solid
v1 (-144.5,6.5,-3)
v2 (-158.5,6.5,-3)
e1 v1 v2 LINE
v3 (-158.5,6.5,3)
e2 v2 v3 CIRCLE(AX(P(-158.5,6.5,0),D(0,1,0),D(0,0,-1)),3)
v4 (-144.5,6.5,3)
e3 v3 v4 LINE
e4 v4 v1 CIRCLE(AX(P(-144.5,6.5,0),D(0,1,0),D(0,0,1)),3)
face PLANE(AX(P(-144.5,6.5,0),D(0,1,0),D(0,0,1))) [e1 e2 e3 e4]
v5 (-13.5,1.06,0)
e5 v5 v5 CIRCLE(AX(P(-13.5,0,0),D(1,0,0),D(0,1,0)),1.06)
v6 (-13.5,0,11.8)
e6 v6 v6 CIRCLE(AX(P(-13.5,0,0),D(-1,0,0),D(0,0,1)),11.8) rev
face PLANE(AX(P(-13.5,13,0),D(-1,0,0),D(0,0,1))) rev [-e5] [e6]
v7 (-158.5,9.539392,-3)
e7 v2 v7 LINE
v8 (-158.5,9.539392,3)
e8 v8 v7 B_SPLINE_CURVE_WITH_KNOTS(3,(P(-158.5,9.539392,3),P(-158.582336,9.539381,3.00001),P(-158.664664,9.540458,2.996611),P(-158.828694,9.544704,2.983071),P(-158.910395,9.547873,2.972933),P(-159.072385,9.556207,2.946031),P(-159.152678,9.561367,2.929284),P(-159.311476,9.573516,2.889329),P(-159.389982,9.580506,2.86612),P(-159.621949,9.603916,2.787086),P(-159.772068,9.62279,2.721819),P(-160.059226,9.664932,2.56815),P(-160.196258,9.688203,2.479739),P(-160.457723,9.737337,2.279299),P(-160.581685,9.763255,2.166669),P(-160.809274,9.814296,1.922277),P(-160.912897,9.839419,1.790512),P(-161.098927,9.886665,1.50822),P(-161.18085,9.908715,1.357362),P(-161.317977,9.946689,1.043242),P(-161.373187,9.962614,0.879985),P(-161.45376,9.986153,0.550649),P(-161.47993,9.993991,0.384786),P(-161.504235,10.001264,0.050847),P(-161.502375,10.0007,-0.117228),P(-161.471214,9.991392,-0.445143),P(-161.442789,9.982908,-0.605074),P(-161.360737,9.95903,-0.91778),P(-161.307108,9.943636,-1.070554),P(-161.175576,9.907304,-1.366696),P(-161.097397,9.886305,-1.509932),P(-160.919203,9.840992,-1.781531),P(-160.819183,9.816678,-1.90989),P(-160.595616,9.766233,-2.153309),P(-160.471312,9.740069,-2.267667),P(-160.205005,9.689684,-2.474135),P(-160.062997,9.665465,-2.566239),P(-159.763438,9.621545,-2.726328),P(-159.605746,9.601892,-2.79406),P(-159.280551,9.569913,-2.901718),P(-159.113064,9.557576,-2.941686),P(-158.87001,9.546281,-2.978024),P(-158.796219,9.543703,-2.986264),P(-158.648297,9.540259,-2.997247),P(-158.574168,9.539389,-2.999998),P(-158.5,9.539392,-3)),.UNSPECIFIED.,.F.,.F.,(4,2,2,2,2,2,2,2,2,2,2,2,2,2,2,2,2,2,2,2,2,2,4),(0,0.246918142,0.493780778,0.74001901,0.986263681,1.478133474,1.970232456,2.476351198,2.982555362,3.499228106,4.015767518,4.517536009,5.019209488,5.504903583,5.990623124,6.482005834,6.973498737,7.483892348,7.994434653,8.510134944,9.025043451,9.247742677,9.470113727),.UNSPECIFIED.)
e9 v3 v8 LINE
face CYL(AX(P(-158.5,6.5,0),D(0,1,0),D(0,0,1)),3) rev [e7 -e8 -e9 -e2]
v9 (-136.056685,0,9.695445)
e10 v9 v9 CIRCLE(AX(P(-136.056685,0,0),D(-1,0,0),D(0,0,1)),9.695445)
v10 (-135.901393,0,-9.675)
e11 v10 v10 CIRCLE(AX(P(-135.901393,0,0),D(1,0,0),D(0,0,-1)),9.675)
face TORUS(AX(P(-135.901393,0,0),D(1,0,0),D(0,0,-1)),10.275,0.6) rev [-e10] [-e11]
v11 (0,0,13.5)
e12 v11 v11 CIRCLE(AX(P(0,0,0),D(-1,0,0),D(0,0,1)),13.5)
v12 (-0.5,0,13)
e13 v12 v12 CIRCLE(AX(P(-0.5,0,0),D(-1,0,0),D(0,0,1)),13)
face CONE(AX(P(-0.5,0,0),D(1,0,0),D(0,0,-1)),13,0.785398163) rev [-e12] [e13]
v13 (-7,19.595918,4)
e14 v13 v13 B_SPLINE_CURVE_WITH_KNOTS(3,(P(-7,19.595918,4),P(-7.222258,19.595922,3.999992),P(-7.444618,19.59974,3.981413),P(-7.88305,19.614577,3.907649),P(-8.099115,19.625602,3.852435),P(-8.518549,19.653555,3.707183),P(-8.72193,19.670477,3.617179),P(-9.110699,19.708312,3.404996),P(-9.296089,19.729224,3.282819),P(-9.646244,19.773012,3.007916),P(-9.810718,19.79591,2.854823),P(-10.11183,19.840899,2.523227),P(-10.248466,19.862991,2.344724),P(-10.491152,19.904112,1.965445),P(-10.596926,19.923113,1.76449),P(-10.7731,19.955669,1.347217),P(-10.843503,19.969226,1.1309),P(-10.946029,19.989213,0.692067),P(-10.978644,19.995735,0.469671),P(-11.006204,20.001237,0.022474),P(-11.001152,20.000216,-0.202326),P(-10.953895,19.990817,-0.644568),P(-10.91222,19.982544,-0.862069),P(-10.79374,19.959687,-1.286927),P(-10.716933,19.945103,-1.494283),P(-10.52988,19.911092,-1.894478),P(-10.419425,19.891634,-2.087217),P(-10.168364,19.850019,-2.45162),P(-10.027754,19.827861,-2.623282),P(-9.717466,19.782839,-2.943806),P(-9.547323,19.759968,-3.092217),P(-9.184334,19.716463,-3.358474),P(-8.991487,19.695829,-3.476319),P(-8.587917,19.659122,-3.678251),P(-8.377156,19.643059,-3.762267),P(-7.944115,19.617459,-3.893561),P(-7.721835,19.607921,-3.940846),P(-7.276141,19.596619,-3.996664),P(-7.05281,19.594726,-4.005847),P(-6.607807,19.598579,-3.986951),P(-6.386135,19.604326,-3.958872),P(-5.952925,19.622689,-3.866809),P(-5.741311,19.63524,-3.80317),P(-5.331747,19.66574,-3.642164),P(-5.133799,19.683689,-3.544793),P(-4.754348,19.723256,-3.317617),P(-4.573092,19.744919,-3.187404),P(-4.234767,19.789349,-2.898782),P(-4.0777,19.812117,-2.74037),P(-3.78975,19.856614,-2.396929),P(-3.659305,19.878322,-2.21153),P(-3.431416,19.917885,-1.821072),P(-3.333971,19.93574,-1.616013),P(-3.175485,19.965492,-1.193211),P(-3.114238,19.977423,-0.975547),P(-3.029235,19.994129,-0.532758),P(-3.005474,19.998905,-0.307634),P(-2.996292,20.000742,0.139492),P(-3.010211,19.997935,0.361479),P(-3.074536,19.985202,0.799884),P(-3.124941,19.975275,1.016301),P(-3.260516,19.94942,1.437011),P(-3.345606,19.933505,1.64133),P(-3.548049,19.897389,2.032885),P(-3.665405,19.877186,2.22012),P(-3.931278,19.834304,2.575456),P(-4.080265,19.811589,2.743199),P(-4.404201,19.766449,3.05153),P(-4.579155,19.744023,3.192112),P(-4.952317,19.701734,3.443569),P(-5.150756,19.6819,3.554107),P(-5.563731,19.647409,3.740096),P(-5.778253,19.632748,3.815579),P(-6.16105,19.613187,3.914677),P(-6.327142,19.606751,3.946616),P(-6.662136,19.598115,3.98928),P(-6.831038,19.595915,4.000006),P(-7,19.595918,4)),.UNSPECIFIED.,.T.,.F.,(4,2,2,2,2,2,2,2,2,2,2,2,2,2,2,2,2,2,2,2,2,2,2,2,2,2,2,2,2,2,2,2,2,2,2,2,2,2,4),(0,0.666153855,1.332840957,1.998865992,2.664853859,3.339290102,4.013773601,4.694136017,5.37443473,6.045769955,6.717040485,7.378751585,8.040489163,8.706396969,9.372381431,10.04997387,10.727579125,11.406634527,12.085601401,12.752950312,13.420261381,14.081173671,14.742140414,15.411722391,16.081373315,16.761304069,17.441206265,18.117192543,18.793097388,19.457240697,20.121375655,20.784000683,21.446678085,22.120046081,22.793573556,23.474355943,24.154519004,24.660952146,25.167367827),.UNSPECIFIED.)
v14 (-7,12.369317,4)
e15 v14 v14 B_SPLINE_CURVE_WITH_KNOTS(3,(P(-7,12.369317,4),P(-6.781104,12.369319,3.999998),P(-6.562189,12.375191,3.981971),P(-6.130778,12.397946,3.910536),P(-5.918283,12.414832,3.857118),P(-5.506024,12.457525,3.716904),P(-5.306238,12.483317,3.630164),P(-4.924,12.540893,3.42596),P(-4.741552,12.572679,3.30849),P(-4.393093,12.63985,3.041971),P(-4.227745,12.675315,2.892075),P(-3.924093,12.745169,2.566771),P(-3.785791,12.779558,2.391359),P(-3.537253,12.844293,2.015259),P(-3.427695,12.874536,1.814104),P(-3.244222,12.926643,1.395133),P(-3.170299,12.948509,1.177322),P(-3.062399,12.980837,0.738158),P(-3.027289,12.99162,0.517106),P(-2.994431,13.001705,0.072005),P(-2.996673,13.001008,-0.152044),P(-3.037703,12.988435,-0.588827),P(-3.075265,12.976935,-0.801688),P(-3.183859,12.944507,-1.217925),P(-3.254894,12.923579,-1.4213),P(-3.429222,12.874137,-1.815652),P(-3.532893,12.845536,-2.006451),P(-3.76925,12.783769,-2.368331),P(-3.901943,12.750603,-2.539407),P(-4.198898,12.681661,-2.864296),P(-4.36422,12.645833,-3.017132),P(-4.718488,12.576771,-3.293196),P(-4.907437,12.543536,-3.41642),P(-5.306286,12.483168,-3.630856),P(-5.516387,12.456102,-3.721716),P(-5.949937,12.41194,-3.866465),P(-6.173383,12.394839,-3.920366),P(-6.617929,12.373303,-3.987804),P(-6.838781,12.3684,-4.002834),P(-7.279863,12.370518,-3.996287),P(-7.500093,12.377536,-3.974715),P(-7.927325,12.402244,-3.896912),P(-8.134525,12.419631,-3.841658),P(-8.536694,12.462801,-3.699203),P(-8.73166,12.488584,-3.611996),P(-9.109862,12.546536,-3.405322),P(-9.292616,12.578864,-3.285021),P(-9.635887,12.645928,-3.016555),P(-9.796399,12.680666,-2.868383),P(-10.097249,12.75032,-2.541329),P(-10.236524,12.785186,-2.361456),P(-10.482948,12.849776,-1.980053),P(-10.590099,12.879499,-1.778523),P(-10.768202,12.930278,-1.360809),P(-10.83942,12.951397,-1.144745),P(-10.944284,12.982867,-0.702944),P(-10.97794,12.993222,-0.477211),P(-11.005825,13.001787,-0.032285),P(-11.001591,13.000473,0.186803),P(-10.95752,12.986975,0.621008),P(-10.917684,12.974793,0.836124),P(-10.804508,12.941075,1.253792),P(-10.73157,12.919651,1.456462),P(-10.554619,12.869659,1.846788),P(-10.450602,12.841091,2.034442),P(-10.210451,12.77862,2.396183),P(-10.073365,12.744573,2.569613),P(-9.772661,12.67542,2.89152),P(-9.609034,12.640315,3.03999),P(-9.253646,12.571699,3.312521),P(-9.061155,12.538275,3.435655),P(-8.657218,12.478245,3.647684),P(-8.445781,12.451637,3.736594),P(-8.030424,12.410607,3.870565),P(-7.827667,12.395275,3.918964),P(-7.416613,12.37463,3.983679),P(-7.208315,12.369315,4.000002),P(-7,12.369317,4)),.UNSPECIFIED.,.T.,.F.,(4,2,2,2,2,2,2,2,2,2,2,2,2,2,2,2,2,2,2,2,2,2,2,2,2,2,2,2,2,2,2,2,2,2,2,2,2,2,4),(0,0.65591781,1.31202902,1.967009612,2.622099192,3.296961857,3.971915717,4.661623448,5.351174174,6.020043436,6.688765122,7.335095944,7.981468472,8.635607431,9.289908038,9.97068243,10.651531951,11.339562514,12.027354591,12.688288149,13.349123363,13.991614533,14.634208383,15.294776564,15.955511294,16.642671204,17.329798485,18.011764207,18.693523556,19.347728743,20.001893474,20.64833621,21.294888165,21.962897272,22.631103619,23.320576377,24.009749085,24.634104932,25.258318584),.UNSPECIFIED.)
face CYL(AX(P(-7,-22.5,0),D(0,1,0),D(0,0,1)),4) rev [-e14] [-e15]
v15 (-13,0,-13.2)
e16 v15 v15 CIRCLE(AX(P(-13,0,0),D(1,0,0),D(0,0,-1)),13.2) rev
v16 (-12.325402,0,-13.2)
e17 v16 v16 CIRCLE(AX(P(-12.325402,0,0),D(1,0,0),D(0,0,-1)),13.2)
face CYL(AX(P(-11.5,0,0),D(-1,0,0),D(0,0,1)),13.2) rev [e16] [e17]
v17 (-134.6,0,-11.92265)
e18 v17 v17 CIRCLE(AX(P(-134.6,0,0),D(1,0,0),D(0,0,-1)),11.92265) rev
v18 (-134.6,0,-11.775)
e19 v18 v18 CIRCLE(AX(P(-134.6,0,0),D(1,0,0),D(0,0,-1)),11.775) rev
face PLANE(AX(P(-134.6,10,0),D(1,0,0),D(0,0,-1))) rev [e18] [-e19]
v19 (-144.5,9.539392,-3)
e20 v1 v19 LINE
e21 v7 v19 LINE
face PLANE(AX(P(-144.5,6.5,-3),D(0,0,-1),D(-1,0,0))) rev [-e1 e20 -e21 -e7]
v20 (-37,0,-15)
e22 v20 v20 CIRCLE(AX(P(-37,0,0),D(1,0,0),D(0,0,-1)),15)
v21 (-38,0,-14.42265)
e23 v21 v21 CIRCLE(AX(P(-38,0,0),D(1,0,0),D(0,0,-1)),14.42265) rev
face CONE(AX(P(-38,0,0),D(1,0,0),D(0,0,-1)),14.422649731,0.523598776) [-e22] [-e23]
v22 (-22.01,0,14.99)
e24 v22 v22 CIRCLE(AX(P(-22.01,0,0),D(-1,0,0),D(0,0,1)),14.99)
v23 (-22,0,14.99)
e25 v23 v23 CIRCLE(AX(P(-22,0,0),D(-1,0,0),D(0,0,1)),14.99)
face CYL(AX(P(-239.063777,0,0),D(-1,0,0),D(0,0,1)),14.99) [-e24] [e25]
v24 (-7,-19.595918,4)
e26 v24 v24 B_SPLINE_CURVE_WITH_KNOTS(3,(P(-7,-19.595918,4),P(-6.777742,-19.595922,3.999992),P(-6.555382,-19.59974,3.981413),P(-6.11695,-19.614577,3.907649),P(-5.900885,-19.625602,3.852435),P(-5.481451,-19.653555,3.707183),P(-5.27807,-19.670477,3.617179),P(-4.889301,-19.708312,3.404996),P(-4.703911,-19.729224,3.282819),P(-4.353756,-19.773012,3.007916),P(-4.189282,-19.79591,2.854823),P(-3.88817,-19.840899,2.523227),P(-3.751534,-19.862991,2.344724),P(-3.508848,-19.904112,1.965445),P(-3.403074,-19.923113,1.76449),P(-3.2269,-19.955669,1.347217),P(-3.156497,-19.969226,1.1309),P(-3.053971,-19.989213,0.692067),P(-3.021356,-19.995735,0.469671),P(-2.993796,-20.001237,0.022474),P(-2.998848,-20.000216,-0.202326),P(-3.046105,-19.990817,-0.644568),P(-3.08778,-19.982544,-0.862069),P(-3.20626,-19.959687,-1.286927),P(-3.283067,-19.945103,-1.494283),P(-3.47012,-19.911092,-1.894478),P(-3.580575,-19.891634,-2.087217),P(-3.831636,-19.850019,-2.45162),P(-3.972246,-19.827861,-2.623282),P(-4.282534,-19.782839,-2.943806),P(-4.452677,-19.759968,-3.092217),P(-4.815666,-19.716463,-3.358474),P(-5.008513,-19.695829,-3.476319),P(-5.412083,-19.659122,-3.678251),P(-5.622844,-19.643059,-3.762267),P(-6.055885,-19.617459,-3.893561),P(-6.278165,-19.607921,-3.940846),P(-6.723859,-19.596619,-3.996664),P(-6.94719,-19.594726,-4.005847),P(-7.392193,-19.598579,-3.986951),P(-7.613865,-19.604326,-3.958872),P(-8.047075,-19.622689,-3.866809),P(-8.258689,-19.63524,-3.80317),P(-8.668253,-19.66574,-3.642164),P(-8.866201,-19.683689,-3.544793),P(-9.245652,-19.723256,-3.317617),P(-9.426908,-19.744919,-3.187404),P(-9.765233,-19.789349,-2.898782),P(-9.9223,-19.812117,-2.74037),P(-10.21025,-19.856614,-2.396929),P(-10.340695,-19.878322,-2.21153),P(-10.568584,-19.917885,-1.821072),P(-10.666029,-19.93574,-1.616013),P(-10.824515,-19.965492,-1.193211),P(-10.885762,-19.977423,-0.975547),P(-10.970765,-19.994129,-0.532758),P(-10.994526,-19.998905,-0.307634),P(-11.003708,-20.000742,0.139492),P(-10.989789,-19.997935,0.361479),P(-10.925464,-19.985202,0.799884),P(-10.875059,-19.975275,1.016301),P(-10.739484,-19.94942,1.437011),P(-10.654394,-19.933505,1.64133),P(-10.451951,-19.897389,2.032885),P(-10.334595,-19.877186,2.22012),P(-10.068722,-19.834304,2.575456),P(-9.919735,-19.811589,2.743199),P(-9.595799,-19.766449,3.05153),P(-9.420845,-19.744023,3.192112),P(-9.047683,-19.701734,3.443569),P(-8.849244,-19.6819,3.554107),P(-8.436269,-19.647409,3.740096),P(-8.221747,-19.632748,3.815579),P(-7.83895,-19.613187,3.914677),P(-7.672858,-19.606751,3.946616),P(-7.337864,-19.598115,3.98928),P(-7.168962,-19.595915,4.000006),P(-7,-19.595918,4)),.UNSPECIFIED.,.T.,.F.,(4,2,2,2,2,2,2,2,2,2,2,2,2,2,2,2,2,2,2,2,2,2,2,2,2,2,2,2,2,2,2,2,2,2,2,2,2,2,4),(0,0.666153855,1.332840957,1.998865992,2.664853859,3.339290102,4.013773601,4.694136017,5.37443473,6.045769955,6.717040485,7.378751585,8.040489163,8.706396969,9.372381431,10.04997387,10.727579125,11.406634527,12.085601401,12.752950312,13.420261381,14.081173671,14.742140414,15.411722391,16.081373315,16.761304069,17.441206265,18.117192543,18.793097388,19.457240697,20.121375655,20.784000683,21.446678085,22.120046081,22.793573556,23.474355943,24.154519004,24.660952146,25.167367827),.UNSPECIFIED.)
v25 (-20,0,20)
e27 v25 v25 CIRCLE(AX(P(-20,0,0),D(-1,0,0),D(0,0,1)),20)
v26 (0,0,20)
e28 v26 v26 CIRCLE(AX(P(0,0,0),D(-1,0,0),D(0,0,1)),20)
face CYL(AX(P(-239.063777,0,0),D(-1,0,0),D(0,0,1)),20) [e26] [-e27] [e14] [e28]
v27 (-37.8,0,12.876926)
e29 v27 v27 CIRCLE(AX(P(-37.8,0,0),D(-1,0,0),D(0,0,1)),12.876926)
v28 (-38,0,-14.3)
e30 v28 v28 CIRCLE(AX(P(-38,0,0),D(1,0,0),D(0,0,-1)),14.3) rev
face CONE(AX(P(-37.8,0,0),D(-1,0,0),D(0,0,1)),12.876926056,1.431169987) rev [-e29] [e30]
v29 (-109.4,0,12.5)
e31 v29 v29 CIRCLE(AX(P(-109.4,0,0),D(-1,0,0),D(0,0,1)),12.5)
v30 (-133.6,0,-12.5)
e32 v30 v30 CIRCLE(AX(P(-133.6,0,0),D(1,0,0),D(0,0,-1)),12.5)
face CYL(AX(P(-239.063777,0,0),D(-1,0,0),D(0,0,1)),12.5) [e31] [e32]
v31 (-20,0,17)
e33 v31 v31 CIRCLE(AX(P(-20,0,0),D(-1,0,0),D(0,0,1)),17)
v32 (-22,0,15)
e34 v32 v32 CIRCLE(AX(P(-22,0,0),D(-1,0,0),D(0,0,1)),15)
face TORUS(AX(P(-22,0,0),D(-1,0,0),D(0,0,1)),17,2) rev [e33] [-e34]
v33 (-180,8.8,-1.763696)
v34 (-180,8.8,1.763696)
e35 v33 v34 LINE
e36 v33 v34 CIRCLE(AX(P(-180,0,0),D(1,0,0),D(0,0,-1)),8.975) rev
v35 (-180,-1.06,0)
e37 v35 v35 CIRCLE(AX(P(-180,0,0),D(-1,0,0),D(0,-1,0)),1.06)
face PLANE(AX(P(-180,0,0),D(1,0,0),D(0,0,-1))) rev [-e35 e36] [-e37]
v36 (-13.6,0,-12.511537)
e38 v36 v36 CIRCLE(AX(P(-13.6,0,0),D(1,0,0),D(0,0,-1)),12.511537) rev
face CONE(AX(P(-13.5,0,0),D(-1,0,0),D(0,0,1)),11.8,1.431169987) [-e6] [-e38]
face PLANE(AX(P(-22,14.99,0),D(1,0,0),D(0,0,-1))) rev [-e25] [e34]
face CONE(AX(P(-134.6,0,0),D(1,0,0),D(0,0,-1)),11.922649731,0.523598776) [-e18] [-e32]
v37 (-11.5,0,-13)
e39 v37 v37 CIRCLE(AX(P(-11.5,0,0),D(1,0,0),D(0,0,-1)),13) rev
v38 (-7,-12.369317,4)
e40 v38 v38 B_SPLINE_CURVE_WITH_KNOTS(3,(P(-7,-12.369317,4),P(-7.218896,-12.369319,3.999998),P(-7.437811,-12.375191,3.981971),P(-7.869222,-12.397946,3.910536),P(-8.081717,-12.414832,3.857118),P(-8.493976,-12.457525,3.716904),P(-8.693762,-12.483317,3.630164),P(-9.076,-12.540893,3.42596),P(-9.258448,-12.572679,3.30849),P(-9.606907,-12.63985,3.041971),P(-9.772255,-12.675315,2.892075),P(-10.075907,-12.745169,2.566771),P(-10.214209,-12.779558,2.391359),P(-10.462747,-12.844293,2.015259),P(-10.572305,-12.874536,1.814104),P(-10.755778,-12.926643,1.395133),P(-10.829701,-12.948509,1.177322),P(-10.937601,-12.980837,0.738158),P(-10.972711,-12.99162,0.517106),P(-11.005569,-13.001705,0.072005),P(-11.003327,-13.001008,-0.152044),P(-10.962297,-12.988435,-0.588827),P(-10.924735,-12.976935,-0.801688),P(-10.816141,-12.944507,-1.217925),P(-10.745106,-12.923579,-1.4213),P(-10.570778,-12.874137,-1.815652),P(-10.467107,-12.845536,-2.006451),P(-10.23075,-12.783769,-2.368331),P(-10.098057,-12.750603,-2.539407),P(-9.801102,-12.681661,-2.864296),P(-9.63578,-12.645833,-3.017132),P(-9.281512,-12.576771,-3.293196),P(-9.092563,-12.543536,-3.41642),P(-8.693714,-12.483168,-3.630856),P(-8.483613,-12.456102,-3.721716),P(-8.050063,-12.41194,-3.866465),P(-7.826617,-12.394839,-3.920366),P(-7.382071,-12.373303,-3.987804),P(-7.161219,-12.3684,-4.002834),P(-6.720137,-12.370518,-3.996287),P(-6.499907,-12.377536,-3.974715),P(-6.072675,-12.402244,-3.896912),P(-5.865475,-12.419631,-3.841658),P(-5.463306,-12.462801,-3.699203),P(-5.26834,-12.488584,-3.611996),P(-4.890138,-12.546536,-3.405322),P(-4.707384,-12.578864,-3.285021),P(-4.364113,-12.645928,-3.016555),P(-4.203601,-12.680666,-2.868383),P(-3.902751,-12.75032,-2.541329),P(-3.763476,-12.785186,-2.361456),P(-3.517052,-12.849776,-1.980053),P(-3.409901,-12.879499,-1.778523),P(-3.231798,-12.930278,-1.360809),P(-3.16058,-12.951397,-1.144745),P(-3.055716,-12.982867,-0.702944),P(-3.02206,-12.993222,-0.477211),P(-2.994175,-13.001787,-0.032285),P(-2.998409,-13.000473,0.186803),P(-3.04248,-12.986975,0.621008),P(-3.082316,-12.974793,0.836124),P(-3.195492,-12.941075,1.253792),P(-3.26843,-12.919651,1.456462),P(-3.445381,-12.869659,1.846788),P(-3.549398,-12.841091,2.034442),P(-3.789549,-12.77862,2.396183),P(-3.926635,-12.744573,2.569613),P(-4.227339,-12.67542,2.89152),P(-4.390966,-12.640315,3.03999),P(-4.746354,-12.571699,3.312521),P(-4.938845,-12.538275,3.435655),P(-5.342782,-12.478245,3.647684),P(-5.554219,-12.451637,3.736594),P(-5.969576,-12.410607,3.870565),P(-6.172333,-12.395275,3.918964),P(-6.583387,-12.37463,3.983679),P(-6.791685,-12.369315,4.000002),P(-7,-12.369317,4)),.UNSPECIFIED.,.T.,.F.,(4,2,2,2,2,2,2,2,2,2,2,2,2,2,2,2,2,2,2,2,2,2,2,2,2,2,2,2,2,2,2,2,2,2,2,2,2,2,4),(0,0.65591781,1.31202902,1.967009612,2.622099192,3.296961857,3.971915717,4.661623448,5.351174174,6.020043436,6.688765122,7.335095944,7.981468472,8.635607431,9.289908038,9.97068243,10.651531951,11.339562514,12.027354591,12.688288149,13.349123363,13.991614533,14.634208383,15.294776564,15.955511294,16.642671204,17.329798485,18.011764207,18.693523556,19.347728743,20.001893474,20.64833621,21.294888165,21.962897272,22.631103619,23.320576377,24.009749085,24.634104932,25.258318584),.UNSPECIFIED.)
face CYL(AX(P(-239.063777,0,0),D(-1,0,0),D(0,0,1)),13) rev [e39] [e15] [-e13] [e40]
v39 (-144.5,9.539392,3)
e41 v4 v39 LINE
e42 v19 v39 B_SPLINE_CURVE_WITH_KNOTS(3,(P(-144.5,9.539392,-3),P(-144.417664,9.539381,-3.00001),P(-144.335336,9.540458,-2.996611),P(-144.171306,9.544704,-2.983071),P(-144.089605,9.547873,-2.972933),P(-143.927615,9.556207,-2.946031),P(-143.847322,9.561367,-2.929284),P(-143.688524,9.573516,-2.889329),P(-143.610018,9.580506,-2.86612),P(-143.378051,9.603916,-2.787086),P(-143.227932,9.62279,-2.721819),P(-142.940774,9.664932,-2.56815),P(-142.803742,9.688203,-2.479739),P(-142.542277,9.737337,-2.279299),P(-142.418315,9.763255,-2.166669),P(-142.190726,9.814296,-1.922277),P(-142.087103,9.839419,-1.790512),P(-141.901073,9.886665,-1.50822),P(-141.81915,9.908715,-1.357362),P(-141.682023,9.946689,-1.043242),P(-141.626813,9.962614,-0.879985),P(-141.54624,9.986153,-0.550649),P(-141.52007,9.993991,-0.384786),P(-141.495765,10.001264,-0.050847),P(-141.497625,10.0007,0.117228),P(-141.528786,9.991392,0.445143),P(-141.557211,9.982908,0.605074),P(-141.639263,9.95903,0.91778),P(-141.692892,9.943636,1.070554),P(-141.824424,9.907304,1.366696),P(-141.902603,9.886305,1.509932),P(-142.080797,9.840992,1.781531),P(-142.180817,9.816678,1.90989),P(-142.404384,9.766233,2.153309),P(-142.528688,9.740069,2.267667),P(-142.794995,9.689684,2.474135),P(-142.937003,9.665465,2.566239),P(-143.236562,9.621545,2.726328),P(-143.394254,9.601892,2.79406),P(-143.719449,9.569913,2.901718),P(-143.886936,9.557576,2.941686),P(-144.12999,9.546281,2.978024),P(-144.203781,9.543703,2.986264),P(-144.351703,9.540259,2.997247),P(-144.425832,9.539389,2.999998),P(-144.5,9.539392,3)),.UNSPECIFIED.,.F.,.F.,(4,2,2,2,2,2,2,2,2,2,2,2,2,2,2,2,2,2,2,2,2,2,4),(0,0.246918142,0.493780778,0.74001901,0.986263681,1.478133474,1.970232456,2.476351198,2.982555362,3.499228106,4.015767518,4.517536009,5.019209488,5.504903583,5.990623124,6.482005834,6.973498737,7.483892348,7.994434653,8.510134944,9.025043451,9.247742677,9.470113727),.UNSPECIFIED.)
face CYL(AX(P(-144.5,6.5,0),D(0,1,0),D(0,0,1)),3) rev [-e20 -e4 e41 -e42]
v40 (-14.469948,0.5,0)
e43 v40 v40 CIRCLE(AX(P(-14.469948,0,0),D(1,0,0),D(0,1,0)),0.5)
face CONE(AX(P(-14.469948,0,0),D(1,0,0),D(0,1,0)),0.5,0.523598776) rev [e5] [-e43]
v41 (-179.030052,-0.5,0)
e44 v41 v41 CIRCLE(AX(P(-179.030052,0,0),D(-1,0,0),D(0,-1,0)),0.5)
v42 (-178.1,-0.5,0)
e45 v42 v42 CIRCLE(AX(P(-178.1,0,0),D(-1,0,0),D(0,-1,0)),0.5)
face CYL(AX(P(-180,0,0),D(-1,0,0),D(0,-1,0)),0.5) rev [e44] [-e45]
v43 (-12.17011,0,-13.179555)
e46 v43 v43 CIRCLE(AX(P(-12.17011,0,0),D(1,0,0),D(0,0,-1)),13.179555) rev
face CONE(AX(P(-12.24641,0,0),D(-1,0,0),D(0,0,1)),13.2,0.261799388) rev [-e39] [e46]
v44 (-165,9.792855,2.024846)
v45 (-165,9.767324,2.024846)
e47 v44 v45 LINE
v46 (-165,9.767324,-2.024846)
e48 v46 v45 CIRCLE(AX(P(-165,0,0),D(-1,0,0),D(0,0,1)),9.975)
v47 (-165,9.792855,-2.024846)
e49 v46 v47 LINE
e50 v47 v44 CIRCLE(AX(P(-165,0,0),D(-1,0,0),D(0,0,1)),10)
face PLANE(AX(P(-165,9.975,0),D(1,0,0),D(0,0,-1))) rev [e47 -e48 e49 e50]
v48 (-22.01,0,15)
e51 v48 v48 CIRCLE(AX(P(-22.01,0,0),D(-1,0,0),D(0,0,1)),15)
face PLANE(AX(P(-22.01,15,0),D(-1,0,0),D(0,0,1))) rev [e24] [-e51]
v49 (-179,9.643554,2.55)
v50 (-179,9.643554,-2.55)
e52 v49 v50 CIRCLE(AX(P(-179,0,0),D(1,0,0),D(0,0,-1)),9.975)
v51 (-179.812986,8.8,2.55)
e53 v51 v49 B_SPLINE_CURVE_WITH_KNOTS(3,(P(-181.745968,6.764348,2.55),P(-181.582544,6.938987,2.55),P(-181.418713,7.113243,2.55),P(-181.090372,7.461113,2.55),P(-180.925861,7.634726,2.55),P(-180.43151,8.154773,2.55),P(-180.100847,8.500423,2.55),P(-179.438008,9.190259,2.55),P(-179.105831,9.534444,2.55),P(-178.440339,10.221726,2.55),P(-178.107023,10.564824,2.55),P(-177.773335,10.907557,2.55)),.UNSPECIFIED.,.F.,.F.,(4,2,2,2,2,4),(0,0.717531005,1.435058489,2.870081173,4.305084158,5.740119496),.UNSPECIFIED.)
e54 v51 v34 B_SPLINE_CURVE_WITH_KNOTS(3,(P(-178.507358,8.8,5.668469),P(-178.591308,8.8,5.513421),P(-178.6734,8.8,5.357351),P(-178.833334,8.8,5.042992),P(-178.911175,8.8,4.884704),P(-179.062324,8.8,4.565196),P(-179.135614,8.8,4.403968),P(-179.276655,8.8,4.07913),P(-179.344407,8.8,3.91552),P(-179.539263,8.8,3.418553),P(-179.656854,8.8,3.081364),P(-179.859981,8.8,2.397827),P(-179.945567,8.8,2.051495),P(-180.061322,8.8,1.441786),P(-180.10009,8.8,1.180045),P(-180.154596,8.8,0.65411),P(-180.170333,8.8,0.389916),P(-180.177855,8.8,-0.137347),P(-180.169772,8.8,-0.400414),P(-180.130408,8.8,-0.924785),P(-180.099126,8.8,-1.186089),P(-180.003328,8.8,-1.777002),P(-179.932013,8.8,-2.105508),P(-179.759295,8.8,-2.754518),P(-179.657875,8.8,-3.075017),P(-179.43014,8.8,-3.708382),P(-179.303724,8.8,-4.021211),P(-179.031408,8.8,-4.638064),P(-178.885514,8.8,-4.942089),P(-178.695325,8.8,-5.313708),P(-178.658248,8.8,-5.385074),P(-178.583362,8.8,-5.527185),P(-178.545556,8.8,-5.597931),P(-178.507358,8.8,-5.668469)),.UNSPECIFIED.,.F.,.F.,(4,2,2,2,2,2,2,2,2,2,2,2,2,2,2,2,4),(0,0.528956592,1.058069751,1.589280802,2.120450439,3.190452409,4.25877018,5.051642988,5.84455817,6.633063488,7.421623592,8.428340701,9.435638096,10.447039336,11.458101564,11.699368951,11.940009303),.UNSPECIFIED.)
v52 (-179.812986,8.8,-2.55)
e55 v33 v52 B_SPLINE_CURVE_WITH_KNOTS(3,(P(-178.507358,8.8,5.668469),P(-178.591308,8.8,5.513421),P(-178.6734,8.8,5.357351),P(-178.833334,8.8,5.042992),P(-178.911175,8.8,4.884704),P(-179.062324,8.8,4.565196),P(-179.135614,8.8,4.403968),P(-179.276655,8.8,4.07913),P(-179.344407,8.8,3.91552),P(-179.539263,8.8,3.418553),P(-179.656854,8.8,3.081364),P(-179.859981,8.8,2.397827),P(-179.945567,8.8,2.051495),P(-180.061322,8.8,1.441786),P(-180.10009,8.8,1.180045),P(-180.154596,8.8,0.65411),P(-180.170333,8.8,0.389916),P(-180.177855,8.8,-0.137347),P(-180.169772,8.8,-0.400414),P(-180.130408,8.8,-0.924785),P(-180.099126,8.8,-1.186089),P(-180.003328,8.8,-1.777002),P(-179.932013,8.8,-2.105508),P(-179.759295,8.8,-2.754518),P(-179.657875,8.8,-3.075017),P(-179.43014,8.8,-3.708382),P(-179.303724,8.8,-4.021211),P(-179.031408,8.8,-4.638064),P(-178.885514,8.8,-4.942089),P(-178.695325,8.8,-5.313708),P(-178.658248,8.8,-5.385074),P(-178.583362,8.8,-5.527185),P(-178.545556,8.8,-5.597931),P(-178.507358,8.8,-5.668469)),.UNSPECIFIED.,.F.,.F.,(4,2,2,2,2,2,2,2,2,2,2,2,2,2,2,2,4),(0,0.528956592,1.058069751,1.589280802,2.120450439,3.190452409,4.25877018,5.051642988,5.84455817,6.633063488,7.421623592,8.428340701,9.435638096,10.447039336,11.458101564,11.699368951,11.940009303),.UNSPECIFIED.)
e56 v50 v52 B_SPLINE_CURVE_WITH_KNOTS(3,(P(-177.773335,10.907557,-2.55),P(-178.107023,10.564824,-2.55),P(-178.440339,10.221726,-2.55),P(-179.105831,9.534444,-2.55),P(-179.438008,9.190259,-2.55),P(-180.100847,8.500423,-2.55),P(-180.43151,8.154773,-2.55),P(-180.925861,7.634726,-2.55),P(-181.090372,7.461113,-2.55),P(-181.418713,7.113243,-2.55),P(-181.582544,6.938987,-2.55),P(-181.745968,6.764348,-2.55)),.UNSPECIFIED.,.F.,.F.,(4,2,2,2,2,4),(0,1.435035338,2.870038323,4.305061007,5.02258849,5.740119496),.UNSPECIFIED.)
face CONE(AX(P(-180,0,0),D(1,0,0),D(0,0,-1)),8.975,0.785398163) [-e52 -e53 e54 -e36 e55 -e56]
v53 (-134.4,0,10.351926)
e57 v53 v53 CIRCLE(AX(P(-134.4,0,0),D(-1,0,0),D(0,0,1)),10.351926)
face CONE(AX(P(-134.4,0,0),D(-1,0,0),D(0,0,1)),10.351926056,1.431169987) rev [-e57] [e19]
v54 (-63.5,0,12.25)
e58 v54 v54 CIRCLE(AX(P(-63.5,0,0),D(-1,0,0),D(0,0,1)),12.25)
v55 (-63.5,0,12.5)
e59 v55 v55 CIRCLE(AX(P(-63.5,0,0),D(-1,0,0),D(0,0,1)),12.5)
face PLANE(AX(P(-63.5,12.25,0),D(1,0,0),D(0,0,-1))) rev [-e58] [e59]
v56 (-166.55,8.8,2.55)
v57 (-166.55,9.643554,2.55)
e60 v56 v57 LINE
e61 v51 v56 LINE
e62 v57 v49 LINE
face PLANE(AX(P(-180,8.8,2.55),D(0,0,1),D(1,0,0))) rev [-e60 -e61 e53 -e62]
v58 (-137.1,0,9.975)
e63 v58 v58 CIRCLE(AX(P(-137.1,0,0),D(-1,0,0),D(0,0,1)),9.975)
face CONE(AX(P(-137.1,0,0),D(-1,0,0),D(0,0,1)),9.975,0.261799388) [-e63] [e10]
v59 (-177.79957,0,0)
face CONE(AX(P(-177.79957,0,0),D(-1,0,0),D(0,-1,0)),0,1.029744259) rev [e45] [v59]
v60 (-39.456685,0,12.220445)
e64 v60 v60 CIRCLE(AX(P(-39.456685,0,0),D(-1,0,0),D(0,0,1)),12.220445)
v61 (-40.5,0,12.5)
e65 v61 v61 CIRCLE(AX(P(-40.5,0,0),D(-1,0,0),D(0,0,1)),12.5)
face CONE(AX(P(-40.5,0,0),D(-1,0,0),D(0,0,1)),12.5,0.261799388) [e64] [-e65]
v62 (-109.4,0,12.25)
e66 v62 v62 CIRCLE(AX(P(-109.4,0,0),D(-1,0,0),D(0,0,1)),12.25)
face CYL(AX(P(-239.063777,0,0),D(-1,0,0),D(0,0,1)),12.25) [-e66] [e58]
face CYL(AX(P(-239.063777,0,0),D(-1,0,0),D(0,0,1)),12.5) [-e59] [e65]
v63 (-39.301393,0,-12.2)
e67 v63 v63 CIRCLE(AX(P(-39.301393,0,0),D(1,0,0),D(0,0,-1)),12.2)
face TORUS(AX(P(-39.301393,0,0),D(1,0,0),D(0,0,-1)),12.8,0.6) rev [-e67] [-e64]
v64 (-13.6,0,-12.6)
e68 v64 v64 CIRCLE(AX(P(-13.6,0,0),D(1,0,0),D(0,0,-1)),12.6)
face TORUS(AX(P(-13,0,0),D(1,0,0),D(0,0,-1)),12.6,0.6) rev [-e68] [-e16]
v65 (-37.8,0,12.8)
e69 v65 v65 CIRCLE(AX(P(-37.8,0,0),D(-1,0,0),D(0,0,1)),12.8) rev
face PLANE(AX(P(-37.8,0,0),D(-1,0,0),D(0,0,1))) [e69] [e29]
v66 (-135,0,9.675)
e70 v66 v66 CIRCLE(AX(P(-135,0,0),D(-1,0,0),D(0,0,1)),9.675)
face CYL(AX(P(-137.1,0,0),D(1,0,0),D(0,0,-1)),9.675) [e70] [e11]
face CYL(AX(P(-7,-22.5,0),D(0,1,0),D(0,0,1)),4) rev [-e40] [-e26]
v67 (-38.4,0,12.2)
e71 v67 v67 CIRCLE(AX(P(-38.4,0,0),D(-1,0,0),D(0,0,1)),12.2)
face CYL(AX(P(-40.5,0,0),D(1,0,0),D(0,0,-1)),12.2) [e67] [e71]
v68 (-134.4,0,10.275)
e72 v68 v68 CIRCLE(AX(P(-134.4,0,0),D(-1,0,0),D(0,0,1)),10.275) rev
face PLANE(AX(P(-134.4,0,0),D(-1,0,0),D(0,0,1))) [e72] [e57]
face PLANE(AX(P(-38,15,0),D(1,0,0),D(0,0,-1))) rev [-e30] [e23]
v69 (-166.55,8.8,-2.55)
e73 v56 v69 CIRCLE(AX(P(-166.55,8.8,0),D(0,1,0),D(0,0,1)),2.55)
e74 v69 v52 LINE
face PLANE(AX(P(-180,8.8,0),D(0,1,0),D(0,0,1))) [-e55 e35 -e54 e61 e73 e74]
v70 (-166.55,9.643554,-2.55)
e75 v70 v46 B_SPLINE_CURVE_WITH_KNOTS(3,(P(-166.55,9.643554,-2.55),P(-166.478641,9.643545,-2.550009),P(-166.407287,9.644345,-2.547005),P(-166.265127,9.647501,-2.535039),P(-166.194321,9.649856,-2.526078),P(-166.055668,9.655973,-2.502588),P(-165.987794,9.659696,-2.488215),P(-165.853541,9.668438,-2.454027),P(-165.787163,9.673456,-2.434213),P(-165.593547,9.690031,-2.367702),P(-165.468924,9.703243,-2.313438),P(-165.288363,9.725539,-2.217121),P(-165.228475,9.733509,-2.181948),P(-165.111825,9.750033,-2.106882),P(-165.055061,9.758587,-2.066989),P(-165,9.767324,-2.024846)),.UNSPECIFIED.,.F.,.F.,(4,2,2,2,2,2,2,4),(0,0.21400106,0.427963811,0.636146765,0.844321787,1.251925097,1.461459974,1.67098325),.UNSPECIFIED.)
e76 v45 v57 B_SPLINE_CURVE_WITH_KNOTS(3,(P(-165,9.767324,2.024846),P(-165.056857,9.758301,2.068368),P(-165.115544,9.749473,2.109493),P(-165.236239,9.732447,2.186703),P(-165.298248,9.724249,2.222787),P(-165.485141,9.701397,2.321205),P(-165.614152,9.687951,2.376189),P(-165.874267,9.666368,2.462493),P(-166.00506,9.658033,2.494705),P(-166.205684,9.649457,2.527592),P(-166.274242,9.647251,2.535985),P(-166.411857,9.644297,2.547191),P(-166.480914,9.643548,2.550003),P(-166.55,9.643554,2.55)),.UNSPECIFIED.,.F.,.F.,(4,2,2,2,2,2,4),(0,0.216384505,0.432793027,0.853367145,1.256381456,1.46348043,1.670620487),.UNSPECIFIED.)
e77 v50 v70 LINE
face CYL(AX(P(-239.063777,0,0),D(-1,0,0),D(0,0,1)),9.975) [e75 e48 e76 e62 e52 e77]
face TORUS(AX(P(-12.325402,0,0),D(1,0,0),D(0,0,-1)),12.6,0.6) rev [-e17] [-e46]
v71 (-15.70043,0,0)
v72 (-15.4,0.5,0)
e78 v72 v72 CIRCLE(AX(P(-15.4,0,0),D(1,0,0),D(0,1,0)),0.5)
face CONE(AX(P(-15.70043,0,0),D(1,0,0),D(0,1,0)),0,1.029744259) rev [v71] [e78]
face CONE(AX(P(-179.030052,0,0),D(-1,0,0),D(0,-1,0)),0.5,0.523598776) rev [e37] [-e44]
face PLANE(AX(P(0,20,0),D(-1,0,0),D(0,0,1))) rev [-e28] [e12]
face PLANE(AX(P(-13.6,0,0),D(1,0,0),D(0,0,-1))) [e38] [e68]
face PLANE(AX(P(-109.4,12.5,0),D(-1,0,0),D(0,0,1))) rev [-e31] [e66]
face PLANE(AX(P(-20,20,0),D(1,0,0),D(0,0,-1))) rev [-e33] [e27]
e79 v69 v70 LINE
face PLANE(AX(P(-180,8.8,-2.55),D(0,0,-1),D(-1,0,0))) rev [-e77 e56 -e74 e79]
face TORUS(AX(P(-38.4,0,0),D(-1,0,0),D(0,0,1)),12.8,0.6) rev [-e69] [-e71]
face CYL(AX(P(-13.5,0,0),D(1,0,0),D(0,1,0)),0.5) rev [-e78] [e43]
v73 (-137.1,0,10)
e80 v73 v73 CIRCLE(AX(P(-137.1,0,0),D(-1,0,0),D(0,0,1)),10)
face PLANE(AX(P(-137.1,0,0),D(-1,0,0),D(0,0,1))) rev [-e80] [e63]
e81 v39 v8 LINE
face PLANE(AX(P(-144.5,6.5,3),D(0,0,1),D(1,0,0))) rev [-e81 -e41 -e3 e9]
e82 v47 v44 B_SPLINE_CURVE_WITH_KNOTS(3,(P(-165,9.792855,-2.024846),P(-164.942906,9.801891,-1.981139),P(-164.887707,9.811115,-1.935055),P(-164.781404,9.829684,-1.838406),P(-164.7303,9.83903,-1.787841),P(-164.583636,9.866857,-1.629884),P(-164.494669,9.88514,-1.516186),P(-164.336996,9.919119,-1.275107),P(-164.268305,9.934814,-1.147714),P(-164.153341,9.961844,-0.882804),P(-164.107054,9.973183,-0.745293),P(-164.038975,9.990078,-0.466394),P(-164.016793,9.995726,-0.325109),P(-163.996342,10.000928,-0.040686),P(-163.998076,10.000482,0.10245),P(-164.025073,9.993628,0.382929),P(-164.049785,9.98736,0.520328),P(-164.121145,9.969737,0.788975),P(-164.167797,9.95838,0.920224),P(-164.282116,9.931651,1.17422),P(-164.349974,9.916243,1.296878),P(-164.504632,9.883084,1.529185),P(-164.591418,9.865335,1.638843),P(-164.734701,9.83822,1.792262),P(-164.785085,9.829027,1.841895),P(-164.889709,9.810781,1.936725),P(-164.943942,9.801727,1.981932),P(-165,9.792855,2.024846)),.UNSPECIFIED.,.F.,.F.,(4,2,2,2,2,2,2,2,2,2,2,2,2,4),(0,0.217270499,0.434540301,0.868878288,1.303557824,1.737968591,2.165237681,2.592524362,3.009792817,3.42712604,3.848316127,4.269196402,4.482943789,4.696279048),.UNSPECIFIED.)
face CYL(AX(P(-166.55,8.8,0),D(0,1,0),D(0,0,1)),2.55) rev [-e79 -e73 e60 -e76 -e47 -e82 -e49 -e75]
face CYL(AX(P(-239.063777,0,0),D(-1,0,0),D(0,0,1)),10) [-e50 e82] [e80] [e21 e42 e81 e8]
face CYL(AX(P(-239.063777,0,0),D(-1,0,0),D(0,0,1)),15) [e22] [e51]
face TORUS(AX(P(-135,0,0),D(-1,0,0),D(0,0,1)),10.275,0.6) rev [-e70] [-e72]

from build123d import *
from OCP.BRepFilletAPI import BRepFilletAPI_MakeChamfer

# Parameters (mm, degrees)
FASE1_SIZE                      = 1
SKIZZE3_R                       = 4
SCHNITT_LINEAR_AUSTRAGEN2_DEPTH = 22.5
SCHNITT_LINEAR_AUSTRAGEN3_DEPTH = 3.5
SCHNITT_LINEAR_AUSTRAGEN4_DEPTH = 1.2
FASE2_SIZE                      = 1
FASE2_SIZE2                     = 0.577350269
SCHNITT_F_T2_DEPTH              = 2
SCHNITT_F_T2_DEPTH_BACK         = 0.1
G_T1_R                          = 13.2
G_T1_R_2                        = 11.8
FASE_15_T1_SIZE2                = 0.746410162
FASE_15_T1_SIZE                 = 0.2
FASE_8_T2_SIZE                  = 0.711536972
FASE_8_T2_SIZE_2                = 0.1
RADIUS_R_R                      = 0.6
SCHNITT_F_T21_DEPTH             = 2.5
SCHNITT_F_T21_DEPTH_BACK        = 0.2
G_T11_R                         = 11.775
G_T11_R_2                       = 9.675
FASE_8_T21_SIZE2                = 1.423073944
FASE_8_T21_SIZE                 = 0.2
RADIUS_R1_R                     = 0.6
SCHNITT_F_T22_DEPTH             = 2.5
SCHNITT_F_T22_DEPTH_BACK        = 0.2
G_T12_R                         = 14.3
G_T12_R_2                       = 12.2
FASE_8_T22_SIZE                 = 1.423073944
FASE_8_T22_SIZE_2               = 0.2
RADIUS_R2_R                     = 0.6


with BuildPart() as part:
    # Skizze1 → Rotation1 (revolve)
    with BuildSketch(Plane.XY, mode=Mode.PRIVATE) as rotation1_sk:
        with BuildLine():
            Line((-180, 0), (-180, 9.975))
            Line((-180, 9.975), (-165, 9.975))
            Line((-165, 9.975), (-165, 10))
            Line((-165, 10), (-134.6, 10))
            Line((-134.6, 10), (-134.6, 12.5))
            Line((-134.6, 12.5), (-109.4, 12.5))
            Line((-109.4, 12.5), (-109.4, 12.25))
            Line((-109.4, 12.25), (-63.5, 12.25))
            Line((-63.5, 12.25), (-63.5, 12.5))
            Line((-63.5, 12.5), (-38, 12.5))
            Line((-38, 12.5), (-38, 15))
            Line((-38, 15), (-22.01, 15))
            Line((-22.01, 15), (-22.01, 14.99))
            Line((-22.01, 14.99), (-22, 14.99))
            Line((-22, 14.99), (-22, 15))
            ThreePointArc((-22, 15), (-20.585786438, 15.585786438), (-20, 17))
            Line((-20, 17), (-20, 20))
            Line((-20, 20), (0, 20))
            Line((0, 20), (0, 13.5))
            Line((0, 13.5), (-0.5, 13))
            Line((-0.5, 13), (-13.5, 13))
            Line((-13.5, 13), (-13.5, 0))
            Line((-13.5, 0), (-180, 0))
        make_face()
    revolve(rotation1_sk.sketch.rotate(Axis((-239.063776618, 0, 0), (1, 0, 0)), 90), axis=Axis((-239.063776618, 0, 0), (1, 0, 0)))

    # Fase1
    fase1_edges = [part.edges().sort_by_distance(p)[0] for p in [
        (-180, 0, -9.975),
    ]]
    chamfer(fase1_edges, length=FASE1_SIZE)

    # Skizze3 → Schnitt-Linear austragen2 (cut, symmetric)
    with BuildSketch(Plane(origin=(0, 0, 0), x_dir=(1, 0, 0), z_dir=(0, 1, 0))):
        with Locations(Location((-7, 0, 0), (0, 0, 270))):
            Circle(SKIZZE3_R)
    extrude(amount=SCHNITT_LINEAR_AUSTRAGEN2_DEPTH, both=True, mode=Mode.SUBTRACT)

    # Skizze6 → Schnitt-Linear austragen3 (cut)
    with BuildSketch(Plane(origin=(0, 10, 0), x_dir=(-1, 0, 0), z_dir=(0, 1, 0))):
        with BuildLine():
            Line((144.5, 3), (158.5, 3))
            ThreePointArc((158.5, 3), (161.5, 0), (158.5, -3))
            Line((158.5, -3), (144.5, -3))
            ThreePointArc((144.5, -3), (141.5, 0), (144.5, 3))
        make_face()
    extrude(amount=-SCHNITT_LINEAR_AUSTRAGEN3_DEPTH, mode=Mode.SUBTRACT)

    # Skizze7 → Schnitt-Linear austragen4 (cut)
    with BuildSketch(Plane(origin=(0, 10, 0), x_dir=(-1, 0, 0), z_dir=(0, 1, 0))):
        with BuildLine():
            Line((180, -2.55), (166.55, -2.55))
            ThreePointArc((166.55, -2.55), (164, 0), (166.55, 2.55))
            Line((166.55, 2.55), (180, 2.55))
            ThreePointArc((180, 2.55), (182.55, 0), (180, -2.55))
        make_face()
    extrude(amount=-SCHNITT_LINEAR_AUSTRAGEN4_DEPTH, mode=Mode.SUBTRACT)

    # Fase2: one chamfer whose edges measure the first distance from different faces: ONE call of the kernel's chamfer builder (chamfer() names one face for all edges)
    fase2_edges_1 = [part.edges().sort_by_distance(p)[0] for p in [
        (-134.6, 0, -12.5),
    ]]
    fase2_side_1 = [part.faces().sort_by_distance(p)[0] for p in [
        (-122, 0, -12.5),
    ]]
    fase2_edges_2 = [part.edges().sort_by_distance(p)[0] for p in [
        (-38, 0, -15),
    ]]
    fase2_side_2 = [part.faces().sort_by_distance(p)[0] for p in [
        (-30.005, 0, -15),
    ]]
    fase2 = BRepFilletAPI_MakeChamfer(part.part.solid().wrapped)
    for e in fase2_edges_1:
        fase2.Add(FASE2_SIZE, FASE2_SIZE2, e.wrapped, fase2_side_1[0].wrapped)  # the first distance lies on this face
    for e in fase2_edges_2:
        fase2.Add(FASE2_SIZE, FASE2_SIZE2, e.wrapped, fase2_side_2[0].wrapped)  # the first distance lies on this face
    add(Compound.cast(fase2.Shape()), mode=Mode.REPLACE)

    # Skizze31 → Schnitt-Rotation1 (revolve, cut)
    with BuildSketch(Plane(origin=(-180, 0, 0), x_dir=(0, 0, 1), z_dir=(0, -1, 0)), mode=Mode.PRIVATE) as schnitt_rotation1_sk:
        Polygon((0, -2.20043031), (0.5, -1.9), (0.5, -0.969948452), (1.06, 0), (0, 0), align=None)
    revolve(schnitt_rotation1_sk.sketch.rotate(Axis((-180, 0, 0), (1, 0, 0)), 90), axis=Axis((-180, 0, 0), (1, 0, 0)), mode=Mode.SUBTRACT)

    # Skizze32 → Schnitt-Rotation11 (revolve, cut)
    with BuildSketch(Plane(origin=(-13.5, 0, 0), x_dir=(0, 0, -1), z_dir=(0, -1, 0)), mode=Mode.PRIVATE) as schnitt_rotation11_sk:
        Polygon((0, -2.20043031), (0.5, -1.9), (0.5, -0.969948452), (1.06, 0), (0, 0), align=None)
    revolve(schnitt_rotation11_sk.sketch.rotate(Axis((-13.5, 0, 0), (-1, 0, 0)), 270), axis=Axis((-13.5, 0, 0), (-1, 0, 0)), mode=Mode.SUBTRACT)

    # g+t1 → Schnitt f+t2 (cut, two sides: drawn at the far end of the back side and taken through both)
    with BuildSketch(Plane(origin=(-13.5, -18.258316634, 5.175605519), x_dir=(0, 0, -1), z_dir=(1, 0, 0)).offset(-SCHNITT_F_T2_DEPTH_BACK)):
        with Locations((5.175605519, 18.258316634)):
            Circle(G_T1_R)
        with Locations(Location((5.175605519, 18.258316634, 0), (0, 0, 180))):
            Circle(G_T1_R_2, mode=Mode.SUBTRACT)
    extrude(amount=SCHNITT_F_T2_DEPTH + SCHNITT_F_T2_DEPTH_BACK, mode=Mode.SUBTRACT)

    # Fase 15° t1
    fase_15_t1_edges = [part.edges().sort_by_distance(p)[0] for p in [
        (-11.5, 0, 13.2),
    ]]
    fase_15_t1_side = [part.faces().sort_by_distance(p)[0] for p in [
        (-11.5, 0, 13.196),
    ]]
    chamfer(fase_15_t1_edges, length=FASE_15_T1_SIZE - 0.0001, length2=FASE_15_T1_SIZE2 - 0.0001, reference=fase_15_t1_side[0])  # a hair under: the kernel refuses the full size

    # Fase 8° t2
    # the kernel refuses this chamfer: 0.711536972, 0.1 mm, written as the material it adds along each edge
    with BuildSketch(Plane(origin=(-13.6, 0, 0), x_dir=(0, 0, 1), z_dir=(0, 1, 0))) as fase_8_t2_piece_1:
        Polygon((11.8 + FASE_8_T2_SIZE, 0), (11.8, FASE_8_T2_SIZE_2), (11.8, 0), align=None)
    revolve(axis=Axis((-13.6, 0, 0), (1, 0, 0)))

    # Radius r
    radius_r_edges = [part.edges().sort_by_distance(p)[0] for p in [
        (-13.6, 0, 13.2),
        (-12.246310162, 0, 13.2),
    ]]
    fillet(radius_r_edges, radius=RADIUS_R_R)

    # g+t11 → Schnitt f+t21 (cut, two sides: drawn at the far end of the back side and taken through both)
    with BuildSketch(Plane(origin=(-134.6, 9.708864876, 5.574410301), x_dir=(0, 0, 1), z_dir=(-1, 0, 0)).offset(-SCHNITT_F_T21_DEPTH_BACK)):
        with Locations(Location((-5.574410301, -9.708864876, 0), (0, 0, 180))):
            Circle(G_T11_R)
        with Locations((-5.574410301, -9.708864876)):
            Circle(G_T11_R_2, mode=Mode.SUBTRACT)
    extrude(amount=SCHNITT_F_T21_DEPTH + SCHNITT_F_T21_DEPTH_BACK, mode=Mode.SUBTRACT)

    # Fase 15° t11: read off the stored shape, not the designer's step
    # Fase 15° t11 outline → Fase 15° t11 (revolve)
    with BuildSketch(Plane.YX):
        Polygon((9.975, -137.1), (9.675, -135.980384758), (9.675, -137.1), align=None)
    revolve(axis=Axis((0, 0, 0), (1, 0, 0)))

    # Fase 8° t21
    fase_8_t21_edges = [part.edges().sort_by_distance(p)[0] for p in [
        (-134.4, 0, 11.775),
    ]]
    fase_8_t21_side = [part.faces().sort_by_distance(p)[0] for p in [
        (-134.404, 0, 11.775),
    ]]
    chamfer(fase_8_t21_edges, length=FASE_8_T21_SIZE - 0.0001, length2=FASE_8_T21_SIZE2 - 0.0001, reference=fase_8_t21_side[0])  # a hair under: the kernel refuses the full size

    # Radius r1
    radius_r1_edges = [part.edges().sort_by_distance(p)[0] for p in [
        (-134.4, 0, -9.675),
        (-135.980384758, 6.841258108, 6.841258108),
    ]]
    fillet(radius_r1_edges, radius=RADIUS_R1_R)

    # g+t12 → Schnitt f+t22 (cut, two sides: drawn at the far end of the back side and taken through both)
    with BuildSketch(Plane(origin=(-38, 10.867060242, 7.130430604), x_dir=(0, 0, 1), z_dir=(-1, 0, 0)).offset(-SCHNITT_F_T22_DEPTH_BACK)):
        with Locations(Location((-7.130430604, -10.867060242, 0), (0, 0, 180))):
            Circle(G_T12_R)
        with Locations((-7.130430604, -10.867060242)):
            Circle(G_T12_R_2, mode=Mode.SUBTRACT)
    extrude(amount=SCHNITT_F_T22_DEPTH + SCHNITT_F_T22_DEPTH_BACK, mode=Mode.SUBTRACT)

    # Fase 15° t12: read off the stored shape, not the designer's step
    # Fase 15° t12 outline → Fase 15° t12 (revolve)
    with BuildSketch(Plane.YX):
        Polygon((12.5, -40.5), (12.2, -39.380384758), (12.2, -40.5), align=None)
    revolve(axis=Axis((0, 0, 0), (1, 0, 0)))

    # Fase 8° t22
    # the kernel refuses this chamfer: 1.423073944, 0.2 mm, written as the material it adds along each edge
    with BuildSketch(Plane(origin=(-37.8, 0, 0), x_dir=(0, 0, -1), z_dir=(0, 1, 0))) as fase_8_t22_piece_1:
        Polygon((14.3 - FASE_8_T22_SIZE, 0), (14.3, FASE_8_T22_SIZE_2), (14.3, 0), align=None)
    revolve(axis=Axis((-37.8, 0, 0), (-1, 0, 0)))

    # Radius r2
    radius_r2_edges = [part.edges().sort_by_distance(p)[0] for p in [
        (-37.8, 0, -12.2),
        (-39.380384758, -8.62670273, -8.62670273),
    ]]
    fillet(radius_r2_edges, radius=RADIUS_R2_R)


solid = part.part
